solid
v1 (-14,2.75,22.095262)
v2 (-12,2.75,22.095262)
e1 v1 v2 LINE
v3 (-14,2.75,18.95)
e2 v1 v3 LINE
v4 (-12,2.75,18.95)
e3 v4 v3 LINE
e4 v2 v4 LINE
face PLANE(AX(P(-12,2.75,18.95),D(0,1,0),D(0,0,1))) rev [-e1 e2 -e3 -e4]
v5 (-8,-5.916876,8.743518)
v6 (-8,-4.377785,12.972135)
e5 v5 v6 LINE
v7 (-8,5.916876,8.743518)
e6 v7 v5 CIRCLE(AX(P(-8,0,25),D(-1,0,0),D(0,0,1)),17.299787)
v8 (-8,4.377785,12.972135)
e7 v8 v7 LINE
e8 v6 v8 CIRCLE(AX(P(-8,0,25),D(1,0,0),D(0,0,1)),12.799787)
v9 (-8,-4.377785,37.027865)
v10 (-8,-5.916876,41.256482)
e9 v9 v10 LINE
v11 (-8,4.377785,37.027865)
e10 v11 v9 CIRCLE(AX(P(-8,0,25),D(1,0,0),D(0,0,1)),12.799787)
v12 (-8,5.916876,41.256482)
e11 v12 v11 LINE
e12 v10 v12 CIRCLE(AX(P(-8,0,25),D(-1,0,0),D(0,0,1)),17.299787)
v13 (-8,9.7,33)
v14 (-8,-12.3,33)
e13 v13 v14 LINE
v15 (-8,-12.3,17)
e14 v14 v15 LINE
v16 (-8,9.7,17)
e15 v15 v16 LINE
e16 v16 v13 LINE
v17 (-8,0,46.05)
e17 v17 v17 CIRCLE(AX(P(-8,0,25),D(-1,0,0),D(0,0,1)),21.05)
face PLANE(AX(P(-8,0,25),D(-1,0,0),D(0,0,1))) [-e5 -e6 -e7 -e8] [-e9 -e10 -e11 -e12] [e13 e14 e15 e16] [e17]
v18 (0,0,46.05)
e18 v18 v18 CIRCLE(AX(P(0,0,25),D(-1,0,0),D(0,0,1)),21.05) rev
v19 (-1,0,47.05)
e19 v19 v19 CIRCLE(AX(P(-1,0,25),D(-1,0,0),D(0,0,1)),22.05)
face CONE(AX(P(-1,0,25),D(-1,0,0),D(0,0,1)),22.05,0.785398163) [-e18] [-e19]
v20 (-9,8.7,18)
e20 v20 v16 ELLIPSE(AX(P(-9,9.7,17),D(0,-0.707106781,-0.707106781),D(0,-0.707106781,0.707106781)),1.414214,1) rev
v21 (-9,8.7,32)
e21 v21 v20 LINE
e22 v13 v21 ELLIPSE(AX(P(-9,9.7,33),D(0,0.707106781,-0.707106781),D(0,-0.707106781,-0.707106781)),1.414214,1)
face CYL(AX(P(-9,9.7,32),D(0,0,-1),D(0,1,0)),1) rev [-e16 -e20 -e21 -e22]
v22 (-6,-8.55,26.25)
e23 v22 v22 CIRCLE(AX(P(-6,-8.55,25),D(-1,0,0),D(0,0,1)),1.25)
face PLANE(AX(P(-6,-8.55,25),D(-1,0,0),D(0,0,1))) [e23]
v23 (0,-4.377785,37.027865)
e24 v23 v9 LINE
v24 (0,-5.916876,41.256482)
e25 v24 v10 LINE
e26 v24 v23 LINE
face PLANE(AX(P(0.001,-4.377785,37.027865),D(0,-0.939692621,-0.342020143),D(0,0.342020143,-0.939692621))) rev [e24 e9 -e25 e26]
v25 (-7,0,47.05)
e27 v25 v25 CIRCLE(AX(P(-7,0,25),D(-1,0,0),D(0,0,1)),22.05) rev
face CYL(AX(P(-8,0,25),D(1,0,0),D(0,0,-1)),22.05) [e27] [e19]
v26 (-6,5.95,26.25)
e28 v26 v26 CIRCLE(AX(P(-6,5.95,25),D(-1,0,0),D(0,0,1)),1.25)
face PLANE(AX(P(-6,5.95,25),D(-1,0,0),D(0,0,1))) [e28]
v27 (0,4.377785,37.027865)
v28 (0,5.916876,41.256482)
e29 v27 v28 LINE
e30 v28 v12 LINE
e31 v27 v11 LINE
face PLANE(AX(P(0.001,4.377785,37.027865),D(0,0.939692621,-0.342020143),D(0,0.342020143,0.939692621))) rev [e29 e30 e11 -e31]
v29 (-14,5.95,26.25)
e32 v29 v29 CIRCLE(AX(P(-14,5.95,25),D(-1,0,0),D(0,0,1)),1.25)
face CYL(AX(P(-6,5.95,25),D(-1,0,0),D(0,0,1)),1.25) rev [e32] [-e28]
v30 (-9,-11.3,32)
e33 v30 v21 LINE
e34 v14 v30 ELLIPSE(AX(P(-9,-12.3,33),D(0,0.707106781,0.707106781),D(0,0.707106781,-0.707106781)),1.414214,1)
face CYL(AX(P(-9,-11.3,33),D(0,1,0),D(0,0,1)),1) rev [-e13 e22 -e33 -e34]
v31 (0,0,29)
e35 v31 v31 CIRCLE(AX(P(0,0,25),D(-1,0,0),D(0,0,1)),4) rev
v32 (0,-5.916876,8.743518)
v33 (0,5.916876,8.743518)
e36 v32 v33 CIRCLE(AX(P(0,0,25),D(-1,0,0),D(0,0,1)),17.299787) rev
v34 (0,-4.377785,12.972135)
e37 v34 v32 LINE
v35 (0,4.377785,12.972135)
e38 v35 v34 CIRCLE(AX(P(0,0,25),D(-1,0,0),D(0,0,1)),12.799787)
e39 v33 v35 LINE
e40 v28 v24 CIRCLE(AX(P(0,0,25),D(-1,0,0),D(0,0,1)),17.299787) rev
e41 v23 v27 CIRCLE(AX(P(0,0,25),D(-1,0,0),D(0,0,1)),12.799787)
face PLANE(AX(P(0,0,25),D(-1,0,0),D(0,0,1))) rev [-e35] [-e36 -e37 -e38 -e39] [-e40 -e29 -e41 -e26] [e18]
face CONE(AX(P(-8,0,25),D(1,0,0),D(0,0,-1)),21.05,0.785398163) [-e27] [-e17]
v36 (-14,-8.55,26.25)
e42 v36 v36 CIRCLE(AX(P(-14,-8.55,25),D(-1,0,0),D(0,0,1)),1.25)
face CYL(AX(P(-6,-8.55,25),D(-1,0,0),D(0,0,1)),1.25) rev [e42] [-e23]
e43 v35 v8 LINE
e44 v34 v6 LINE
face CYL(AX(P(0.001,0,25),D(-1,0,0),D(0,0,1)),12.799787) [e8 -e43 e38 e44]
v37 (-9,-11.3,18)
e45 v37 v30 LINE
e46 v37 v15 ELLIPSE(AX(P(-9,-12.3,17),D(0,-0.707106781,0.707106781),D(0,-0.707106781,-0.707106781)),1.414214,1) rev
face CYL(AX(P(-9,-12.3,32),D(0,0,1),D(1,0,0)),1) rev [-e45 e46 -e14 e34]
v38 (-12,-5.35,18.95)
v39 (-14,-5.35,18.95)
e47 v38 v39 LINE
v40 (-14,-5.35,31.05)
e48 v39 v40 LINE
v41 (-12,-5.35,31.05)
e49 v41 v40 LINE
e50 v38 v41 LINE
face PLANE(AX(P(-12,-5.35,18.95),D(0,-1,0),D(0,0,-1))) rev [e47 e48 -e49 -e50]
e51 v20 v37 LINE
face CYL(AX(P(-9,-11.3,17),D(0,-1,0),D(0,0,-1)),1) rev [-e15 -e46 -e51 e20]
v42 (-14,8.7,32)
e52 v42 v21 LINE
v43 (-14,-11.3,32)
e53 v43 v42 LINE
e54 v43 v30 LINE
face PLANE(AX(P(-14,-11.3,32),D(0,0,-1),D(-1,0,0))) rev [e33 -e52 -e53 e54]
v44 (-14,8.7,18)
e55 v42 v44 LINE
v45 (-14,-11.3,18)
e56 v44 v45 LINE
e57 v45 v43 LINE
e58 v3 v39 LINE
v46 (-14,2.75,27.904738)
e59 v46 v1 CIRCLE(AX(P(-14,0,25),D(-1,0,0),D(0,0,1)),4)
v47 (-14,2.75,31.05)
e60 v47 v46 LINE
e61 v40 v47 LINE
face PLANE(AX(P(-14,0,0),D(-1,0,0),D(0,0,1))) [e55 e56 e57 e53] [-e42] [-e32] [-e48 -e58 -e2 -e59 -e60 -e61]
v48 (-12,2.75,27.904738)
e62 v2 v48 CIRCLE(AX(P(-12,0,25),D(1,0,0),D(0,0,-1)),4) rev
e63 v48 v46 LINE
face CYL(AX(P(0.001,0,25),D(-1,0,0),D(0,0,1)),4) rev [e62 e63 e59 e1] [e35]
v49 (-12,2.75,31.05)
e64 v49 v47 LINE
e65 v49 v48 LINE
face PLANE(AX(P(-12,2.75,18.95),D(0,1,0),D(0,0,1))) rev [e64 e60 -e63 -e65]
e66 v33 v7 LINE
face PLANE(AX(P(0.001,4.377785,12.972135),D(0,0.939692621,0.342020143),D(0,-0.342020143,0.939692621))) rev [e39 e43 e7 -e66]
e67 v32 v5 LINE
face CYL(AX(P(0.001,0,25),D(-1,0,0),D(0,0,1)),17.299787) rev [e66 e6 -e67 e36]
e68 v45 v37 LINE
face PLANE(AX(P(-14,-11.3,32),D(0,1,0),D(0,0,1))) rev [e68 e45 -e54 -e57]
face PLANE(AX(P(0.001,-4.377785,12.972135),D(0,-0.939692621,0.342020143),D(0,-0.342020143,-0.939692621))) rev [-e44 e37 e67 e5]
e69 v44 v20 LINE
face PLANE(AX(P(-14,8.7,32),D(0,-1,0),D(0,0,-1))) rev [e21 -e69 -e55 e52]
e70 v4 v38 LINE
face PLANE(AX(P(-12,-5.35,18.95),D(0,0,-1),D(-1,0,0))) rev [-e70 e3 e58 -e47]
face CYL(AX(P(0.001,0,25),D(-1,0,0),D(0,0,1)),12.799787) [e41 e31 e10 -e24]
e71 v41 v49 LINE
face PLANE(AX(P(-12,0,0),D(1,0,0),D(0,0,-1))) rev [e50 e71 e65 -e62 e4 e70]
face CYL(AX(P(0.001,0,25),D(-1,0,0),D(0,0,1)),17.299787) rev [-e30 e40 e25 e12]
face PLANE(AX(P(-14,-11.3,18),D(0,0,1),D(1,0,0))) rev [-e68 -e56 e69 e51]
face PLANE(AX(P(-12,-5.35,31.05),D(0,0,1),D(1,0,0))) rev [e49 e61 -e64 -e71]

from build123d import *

# Parameters (mm, degrees)
SKETCH1_R           = 22.05
BOSS_EXTRUDE1_DEPTH = 8
CUT_EXTRUDE1_REACH  = 54.573
SKETCH2_R           = 4
CUT_EXTRUDE2_REACH  = 54.573
FILLET1_SIZE        = 1
BOSS_EXTRUDE2_START = 6
SKETCH4_W           = 14
SKETCH4_H           = 20
SKETCH4_R           = 4
BOSS_EXTRUDE2_DEPTH = 6
SKETCH6_W           = 12.1
SKETCH6_H           = 8.1
CUT_EXTRUDE3_DEPTH  = 2
SKETCH7_R           = 1.25
CUT_EXTRUDE4_DEPTH  = 8
FILLET2_R           = 1


with BuildPart() as part:
    # Sketch1 → Boss-Extrude1 (new body)
    with BuildSketch(Plane.ZY):
        with Locations((25, 0)):
            Circle(SKETCH1_R)
    extrude(amount=BOSS_EXTRUDE1_DEPTH)

    # Sketch2 → Cut-Extrude1 (cut, up to next)
    with BuildSketch(Plane.ZY.offset(8), mode=Mode.PRIVATE) as cut_extrude1_sk1:
        with Locations((25, 0)):
            Circle(SKETCH2_R)
    cut_extrude1_tool1 = extrude(cut_extrude1_sk1.sketch, amount=-CUT_EXTRUDE1_REACH, mode=Mode.PRIVATE) & part.part
    add(cut_extrude1_tool1.solids().sort_by_distance((-8, 0, 25))[0], mode=Mode.SUBTRACT)

    # Sketch3 → Cut-Extrude2 (cut, up to next)
    with BuildSketch(Plane.ZY.offset(8), mode=Mode.PRIVATE) as cut_extrude2_sk1:
        with BuildLine():
            Line((12.972134752, -4.377784932), (8.743517959, -5.916875577))
            ThreePointArc((8.743517959, -5.916875577), (7.700213153, 0), (8.743517959, 5.916875577))
            Line((8.743517959, 5.916875577), (12.972134752, 4.377784932))
            ThreePointArc((12.972134752, 4.377784932), (12.200213153, 0), (12.972134752, -4.377784932))
        make_face()
    cut_extrude2_tool1 = extrude(cut_extrude2_sk1.sketch, amount=-CUT_EXTRUDE2_REACH, mode=Mode.PRIVATE) & part.part
    # Sketch3 → Cut-Extrude2 (cut, up to next)
    with BuildSketch(Plane.ZY.offset(8), mode=Mode.PRIVATE) as cut_extrude2_sk2:
        with BuildLine():
            Line((37.027865248, -4.377784932), (41.256482041, -5.916875577))
            ThreePointArc((41.256482041, -5.916875577), (42.299786847, 0), (41.256482041, 5.916875577))
            Line((41.256482041, 5.916875577), (37.027865248, 4.377784932))
            ThreePointArc((37.027865248, 4.377784932), (37.799786847, 0), (37.027865248, -4.377784932))
        make_face()
    cut_extrude2_tool2 = extrude(cut_extrude2_sk2.sketch, amount=-CUT_EXTRUDE2_REACH, mode=Mode.PRIVATE) & part.part
    add(cut_extrude2_tool1.solids().sort_by_distance((-8, 0, 10.14412))[0], mode=Mode.SUBTRACT)
    add(cut_extrude2_tool2.solids().sort_by_distance((-8, 0, 39.85588))[0], mode=Mode.SUBTRACT)

    # Fillet1
    fillet1_edges = [part.edges().sort_by_distance(p)[0] for p in [
        (0, 0, 2.95),
        (-8, 0, 2.95),
    ]]
    chamfer(fillet1_edges, length=FILLET1_SIZE)

    # Sketch4 → Boss-Extrude2 (add)
    with BuildSketch(Plane.ZY.offset(8).offset(BOSS_EXTRUDE2_START)):
        with Locations((25, -1.3)):
            Rectangle(SKETCH4_W, SKETCH4_H)
        with Locations((25, 0)):
            Circle(SKETCH4_R, mode=Mode.SUBTRACT)
    extrude(amount=-BOSS_EXTRUDE2_DEPTH)

    # Sketch6 → Cut-Extrude3 (cut)
    with BuildSketch(Plane.ZY.offset(14)):
        with Locations((25, -1.3)):
            Rectangle(SKETCH6_W, SKETCH6_H)
    extrude(amount=-CUT_EXTRUDE3_DEPTH, mode=Mode.SUBTRACT)

    # Sketch7 → Cut-Extrude4 (cut)
    with BuildSketch(Plane.ZY.offset(14)):
        with Locations((25, 5.95)):
            Circle(SKETCH7_R)
        with Locations((25, -8.55)):
            Circle(SKETCH7_R)
    extrude(amount=-CUT_EXTRUDE4_DEPTH, mode=Mode.SUBTRACT)

    # Fillet2
    fillet2_edges = [part.edges().sort_by_distance(p)[0] for p in [
        (-8, -1.3, 32),
        (-8, 8.7, 25),
        (-8, -1.3, 18),
        (-8, -11.3, 25),
    ]]
    fillet(fillet2_edges, radius=FILLET2_R)


solid = part.part
